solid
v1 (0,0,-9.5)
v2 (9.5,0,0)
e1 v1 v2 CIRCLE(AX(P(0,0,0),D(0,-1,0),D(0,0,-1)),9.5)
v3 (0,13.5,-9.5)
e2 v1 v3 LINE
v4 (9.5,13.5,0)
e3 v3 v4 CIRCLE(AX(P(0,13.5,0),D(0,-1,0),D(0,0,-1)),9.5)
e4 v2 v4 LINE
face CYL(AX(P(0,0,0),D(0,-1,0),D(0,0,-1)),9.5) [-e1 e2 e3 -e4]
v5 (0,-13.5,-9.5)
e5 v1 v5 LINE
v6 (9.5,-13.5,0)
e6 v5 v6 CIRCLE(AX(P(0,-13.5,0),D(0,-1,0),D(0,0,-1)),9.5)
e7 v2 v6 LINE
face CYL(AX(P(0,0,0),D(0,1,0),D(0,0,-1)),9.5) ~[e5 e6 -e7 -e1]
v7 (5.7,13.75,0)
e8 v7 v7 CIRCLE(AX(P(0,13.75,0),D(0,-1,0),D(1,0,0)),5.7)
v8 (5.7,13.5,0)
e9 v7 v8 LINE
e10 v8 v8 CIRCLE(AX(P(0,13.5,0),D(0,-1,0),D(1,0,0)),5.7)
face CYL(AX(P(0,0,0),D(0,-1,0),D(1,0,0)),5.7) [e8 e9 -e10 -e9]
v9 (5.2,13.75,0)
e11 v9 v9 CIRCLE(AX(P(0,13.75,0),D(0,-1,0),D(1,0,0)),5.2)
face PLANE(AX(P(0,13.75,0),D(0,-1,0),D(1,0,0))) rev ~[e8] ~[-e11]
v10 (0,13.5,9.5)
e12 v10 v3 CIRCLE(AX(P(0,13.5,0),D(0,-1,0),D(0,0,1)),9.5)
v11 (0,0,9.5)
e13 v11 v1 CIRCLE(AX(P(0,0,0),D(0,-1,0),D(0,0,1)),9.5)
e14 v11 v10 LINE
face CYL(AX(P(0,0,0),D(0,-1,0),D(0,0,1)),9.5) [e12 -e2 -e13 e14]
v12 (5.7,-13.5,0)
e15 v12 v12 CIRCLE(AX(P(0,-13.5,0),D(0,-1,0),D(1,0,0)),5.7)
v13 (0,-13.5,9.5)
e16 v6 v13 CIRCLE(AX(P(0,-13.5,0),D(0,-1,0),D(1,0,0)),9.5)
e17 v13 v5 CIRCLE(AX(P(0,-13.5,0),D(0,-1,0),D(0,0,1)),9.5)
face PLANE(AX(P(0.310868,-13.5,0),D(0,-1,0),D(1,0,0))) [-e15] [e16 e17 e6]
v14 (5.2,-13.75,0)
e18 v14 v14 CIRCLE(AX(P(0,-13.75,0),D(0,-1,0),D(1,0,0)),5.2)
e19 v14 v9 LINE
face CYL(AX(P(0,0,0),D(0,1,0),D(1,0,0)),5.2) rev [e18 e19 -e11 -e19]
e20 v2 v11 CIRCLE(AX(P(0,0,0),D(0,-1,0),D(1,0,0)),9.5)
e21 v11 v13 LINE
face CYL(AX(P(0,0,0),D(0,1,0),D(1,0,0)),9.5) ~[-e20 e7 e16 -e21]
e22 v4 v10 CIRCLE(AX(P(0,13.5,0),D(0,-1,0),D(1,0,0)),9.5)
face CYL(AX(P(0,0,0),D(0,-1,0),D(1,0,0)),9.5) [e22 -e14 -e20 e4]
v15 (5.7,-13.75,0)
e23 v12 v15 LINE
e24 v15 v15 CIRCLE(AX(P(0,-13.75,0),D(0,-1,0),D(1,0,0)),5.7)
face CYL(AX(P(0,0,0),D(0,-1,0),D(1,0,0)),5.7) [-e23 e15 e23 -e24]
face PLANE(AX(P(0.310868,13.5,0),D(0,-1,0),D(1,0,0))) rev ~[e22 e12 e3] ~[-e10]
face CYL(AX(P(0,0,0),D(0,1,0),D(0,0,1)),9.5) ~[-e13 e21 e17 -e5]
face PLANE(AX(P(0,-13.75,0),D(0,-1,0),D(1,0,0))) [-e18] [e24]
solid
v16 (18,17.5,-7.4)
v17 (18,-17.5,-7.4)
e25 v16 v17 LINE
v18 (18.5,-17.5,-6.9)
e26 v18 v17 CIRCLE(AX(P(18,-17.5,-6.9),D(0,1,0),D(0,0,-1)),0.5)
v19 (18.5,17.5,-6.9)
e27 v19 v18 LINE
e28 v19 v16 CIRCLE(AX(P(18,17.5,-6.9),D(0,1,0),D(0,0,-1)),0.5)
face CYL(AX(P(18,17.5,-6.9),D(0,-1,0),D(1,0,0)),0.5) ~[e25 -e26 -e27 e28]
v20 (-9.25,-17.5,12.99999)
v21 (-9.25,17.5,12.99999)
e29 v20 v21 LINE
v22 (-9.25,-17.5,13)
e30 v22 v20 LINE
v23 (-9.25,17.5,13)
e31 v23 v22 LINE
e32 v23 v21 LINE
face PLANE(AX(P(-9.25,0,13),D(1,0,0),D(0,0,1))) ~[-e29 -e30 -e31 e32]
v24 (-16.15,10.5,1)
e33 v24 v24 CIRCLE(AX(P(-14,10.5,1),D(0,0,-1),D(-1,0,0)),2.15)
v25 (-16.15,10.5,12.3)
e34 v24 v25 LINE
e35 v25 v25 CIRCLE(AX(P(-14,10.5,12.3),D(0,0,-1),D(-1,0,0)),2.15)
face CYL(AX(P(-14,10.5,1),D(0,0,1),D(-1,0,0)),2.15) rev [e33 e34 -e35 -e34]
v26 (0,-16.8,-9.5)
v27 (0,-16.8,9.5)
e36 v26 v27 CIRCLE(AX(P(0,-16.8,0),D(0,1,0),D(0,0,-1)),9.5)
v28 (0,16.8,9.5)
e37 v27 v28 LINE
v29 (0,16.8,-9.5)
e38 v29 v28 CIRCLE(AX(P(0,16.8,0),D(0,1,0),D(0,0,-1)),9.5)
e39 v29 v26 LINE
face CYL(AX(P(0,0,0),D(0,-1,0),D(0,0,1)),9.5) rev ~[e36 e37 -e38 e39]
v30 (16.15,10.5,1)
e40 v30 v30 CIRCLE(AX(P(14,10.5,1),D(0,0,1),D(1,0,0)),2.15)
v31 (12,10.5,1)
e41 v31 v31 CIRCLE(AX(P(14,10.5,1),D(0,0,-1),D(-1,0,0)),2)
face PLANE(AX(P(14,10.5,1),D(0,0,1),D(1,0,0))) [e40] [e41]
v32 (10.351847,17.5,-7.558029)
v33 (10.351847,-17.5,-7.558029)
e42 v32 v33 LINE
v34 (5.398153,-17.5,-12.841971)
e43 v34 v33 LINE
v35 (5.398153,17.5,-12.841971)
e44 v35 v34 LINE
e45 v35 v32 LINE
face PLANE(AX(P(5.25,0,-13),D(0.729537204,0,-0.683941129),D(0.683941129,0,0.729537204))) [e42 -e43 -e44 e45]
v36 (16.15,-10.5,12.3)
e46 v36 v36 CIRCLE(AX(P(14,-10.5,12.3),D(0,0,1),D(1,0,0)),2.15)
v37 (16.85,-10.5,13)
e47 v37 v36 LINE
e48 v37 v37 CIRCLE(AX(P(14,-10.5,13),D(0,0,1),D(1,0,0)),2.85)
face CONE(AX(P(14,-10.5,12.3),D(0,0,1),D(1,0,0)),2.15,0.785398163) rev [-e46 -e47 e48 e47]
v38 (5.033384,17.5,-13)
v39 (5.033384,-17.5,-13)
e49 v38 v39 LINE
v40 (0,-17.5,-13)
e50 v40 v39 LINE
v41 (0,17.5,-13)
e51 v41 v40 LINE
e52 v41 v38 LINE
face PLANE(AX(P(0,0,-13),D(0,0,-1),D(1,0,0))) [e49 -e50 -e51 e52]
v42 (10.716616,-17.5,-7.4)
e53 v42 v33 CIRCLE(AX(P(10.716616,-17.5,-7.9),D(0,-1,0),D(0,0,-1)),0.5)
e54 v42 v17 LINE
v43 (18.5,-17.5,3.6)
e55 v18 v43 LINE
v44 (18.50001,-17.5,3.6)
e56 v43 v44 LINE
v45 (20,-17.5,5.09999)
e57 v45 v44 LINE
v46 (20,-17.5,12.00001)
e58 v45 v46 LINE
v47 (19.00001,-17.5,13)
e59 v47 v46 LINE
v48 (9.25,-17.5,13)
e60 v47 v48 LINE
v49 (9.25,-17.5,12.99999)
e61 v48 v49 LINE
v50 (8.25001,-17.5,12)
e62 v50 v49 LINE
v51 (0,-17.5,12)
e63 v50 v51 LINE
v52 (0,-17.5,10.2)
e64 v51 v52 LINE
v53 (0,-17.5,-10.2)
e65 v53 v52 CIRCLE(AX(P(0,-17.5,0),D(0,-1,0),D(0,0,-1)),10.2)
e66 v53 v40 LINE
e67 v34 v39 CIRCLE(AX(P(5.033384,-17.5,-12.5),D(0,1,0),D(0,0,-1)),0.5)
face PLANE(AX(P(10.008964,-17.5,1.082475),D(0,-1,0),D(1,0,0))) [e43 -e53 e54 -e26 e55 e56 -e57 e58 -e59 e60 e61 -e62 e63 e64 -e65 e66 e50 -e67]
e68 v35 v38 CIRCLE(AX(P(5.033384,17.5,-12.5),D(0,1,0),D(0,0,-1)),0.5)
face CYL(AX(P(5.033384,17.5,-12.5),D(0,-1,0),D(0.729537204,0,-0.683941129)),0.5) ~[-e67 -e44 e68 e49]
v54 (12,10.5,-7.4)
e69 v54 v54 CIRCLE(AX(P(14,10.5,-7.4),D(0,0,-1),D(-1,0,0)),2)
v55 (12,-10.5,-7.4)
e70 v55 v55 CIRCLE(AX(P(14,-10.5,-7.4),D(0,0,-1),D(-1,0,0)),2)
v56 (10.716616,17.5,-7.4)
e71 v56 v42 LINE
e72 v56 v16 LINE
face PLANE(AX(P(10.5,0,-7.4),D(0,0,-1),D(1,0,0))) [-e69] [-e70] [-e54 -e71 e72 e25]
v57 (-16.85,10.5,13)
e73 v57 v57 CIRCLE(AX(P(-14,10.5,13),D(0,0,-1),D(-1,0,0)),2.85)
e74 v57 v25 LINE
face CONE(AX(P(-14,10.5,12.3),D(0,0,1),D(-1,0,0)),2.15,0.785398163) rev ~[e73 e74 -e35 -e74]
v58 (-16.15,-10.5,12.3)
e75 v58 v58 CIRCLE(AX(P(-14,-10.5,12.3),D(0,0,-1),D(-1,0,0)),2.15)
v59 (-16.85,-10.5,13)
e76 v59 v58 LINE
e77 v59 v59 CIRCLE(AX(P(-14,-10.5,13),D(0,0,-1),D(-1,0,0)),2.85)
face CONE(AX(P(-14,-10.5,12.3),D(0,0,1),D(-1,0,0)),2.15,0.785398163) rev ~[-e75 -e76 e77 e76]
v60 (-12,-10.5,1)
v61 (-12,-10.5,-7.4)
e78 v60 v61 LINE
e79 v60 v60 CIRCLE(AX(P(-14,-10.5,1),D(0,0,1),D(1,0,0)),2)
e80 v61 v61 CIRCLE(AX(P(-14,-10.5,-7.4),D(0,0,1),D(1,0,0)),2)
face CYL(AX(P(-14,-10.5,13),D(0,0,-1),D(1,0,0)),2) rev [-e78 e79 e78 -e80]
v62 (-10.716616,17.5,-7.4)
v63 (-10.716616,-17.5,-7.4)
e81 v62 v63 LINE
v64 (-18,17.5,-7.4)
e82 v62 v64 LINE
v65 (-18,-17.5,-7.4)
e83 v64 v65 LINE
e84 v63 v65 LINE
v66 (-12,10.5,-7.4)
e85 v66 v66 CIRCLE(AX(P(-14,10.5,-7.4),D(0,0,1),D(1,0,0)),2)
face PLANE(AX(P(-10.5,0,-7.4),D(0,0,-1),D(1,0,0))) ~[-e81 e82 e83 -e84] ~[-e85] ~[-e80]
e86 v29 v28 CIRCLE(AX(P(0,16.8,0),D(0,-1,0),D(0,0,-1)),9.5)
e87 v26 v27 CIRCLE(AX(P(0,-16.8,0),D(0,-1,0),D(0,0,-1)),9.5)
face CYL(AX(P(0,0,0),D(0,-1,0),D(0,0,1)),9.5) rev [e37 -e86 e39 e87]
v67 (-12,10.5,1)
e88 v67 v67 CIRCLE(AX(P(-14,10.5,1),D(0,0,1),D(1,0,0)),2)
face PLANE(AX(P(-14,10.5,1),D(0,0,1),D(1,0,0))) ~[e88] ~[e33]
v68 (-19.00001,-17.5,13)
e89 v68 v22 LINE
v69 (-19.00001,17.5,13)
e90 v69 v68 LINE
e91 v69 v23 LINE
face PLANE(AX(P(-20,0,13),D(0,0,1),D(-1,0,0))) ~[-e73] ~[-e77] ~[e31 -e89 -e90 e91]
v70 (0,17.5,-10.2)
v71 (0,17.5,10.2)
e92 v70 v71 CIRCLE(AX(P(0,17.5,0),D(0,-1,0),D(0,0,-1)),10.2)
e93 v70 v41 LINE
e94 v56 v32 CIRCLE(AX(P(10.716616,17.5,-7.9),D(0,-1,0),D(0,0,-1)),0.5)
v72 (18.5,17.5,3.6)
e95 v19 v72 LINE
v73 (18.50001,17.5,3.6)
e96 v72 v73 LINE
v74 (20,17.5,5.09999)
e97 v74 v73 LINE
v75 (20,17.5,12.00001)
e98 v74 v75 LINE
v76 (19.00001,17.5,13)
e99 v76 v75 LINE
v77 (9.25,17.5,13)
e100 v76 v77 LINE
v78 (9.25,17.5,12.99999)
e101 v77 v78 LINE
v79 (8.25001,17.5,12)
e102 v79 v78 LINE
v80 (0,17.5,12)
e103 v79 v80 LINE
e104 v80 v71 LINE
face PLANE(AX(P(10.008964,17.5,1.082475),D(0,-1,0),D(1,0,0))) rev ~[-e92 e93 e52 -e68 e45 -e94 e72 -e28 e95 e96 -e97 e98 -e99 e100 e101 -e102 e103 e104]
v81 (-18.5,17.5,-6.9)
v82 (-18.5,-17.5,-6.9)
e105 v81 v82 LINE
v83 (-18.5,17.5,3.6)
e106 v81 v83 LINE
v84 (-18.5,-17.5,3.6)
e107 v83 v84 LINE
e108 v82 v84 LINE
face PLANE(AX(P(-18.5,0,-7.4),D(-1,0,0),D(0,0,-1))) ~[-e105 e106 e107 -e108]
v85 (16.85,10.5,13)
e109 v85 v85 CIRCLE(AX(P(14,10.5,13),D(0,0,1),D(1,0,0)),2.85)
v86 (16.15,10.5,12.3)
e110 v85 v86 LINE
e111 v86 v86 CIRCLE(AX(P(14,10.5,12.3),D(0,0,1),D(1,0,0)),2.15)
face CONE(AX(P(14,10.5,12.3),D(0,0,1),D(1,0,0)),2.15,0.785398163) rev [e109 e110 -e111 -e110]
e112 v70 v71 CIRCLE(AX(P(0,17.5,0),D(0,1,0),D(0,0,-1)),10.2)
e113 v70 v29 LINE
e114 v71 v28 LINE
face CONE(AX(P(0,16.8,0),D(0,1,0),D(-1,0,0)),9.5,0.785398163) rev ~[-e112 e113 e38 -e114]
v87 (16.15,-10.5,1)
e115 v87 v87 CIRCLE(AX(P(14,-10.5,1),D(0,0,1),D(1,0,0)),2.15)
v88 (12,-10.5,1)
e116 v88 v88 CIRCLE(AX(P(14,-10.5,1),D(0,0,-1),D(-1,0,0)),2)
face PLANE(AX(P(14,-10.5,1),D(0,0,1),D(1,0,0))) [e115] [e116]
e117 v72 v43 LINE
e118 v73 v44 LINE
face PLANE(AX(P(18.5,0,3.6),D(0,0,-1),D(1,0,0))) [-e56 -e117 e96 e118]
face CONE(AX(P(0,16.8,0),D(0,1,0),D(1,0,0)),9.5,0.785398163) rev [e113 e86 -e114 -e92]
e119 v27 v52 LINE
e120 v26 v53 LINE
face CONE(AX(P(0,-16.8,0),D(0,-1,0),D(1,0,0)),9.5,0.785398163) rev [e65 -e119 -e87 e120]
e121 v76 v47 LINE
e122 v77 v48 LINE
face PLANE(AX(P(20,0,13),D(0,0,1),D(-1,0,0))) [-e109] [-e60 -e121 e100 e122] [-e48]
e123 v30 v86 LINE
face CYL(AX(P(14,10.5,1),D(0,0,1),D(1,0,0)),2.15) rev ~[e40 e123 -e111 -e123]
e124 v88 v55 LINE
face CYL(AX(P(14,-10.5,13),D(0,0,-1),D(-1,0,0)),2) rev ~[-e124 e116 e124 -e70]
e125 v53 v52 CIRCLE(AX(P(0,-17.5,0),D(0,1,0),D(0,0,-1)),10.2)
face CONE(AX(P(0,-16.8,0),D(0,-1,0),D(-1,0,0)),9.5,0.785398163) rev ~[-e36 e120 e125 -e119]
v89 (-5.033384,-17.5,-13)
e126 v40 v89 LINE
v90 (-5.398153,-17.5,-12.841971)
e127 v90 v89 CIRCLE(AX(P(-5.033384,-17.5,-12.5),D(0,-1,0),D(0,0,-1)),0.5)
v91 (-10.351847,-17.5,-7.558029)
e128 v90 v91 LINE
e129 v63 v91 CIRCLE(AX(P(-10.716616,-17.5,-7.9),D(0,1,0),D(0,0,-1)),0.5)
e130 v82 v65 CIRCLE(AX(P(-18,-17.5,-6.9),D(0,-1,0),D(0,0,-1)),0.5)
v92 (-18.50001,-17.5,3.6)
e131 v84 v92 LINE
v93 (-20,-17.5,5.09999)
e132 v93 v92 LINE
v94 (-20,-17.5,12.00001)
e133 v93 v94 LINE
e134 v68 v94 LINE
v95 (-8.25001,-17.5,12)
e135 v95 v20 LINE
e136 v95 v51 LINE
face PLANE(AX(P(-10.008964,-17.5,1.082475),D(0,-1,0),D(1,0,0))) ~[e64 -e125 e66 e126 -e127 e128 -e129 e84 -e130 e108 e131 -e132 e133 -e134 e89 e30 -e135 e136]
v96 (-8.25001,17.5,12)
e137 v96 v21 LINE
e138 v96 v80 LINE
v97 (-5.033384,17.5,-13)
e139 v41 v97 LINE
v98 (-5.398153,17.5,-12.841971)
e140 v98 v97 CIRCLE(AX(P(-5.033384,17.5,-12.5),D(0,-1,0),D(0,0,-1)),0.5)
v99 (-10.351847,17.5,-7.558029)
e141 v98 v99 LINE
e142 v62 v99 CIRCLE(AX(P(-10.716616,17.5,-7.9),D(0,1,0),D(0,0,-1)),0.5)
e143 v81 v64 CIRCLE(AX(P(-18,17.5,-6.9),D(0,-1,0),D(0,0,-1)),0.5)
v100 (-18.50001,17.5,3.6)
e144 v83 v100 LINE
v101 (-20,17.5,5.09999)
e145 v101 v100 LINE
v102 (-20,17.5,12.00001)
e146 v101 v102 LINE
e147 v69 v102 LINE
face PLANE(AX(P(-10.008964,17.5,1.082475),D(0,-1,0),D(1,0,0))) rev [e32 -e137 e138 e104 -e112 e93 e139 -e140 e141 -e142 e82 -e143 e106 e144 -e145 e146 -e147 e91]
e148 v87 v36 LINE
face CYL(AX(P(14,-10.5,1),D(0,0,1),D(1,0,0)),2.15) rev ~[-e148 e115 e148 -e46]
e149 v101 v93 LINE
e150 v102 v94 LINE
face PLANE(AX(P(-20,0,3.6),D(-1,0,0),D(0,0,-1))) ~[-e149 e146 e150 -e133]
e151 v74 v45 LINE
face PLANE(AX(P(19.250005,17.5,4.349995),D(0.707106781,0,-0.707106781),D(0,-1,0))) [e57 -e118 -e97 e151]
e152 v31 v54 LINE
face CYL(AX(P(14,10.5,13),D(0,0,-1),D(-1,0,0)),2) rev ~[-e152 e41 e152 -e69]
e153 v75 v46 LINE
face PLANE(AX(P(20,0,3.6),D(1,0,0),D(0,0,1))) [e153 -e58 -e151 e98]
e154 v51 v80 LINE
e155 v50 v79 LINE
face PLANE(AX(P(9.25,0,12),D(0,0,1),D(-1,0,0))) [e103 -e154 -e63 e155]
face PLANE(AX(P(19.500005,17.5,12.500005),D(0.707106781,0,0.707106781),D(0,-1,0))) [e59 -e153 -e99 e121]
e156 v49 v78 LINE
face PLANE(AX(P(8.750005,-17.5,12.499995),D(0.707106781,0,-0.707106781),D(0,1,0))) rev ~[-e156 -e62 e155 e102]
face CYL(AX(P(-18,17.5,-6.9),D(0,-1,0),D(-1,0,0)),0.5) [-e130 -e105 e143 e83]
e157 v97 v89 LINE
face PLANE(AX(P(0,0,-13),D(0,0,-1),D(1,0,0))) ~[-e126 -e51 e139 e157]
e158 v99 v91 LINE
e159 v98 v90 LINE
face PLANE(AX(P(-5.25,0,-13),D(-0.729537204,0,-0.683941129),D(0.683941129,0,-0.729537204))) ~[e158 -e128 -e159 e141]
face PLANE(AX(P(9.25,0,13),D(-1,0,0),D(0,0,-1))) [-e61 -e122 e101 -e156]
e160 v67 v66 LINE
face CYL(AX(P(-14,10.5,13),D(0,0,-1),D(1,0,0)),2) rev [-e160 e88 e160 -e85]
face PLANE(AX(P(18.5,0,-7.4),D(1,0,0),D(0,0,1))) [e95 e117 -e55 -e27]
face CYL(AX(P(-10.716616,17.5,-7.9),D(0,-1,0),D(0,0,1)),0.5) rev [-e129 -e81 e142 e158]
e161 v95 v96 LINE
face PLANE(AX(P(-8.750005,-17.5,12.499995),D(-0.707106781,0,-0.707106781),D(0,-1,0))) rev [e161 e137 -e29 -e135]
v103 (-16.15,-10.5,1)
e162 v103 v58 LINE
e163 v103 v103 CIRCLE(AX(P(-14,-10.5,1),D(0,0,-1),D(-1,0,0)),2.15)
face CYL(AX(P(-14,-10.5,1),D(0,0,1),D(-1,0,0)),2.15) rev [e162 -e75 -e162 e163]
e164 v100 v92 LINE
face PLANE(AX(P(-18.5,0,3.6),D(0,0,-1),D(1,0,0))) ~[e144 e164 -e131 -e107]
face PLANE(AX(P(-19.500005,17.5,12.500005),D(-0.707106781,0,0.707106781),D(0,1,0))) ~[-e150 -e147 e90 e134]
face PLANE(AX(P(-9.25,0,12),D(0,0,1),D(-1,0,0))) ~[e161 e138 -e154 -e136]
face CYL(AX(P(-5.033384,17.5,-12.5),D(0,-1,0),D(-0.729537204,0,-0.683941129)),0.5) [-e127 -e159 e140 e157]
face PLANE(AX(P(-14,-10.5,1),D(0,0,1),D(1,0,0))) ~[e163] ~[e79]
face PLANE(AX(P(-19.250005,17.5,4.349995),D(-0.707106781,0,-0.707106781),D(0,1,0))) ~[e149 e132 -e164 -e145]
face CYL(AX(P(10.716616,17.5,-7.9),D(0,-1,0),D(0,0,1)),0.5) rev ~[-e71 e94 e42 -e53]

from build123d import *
from build123d import SkipClean  # not in build123d's __all__

# Parameters (mm, degrees)
F1_DEPTH       = 17.5
F2_SIZE        = 0.99999
F3_SIZE        = 1.49999
F4_R           = 0.5
F6_D           = 4
F6_CBORE_D     = 4.3
F6_CBORE_DEPTH = 12
F7_SIZE        = 0.7
F0_R           = 5.7
F8_DEPTH       = 13.5
F0_R_2         = 5.2
F9_DEPTH       = 13.75


# Not quite as in the source:
# - a fillet or chamfer is up to 0.001 mm smaller than in the source, because OpenCascade refuses the exact size


with BuildPart() as f1:
    # F0 (on Front) → F1 (new body, symmetric)
    with BuildSketch(Plane.XZ):
        with BuildLine():
            ThreePointArc((0, 9.5), (6.7175144213, 6.7175144213), (9.5, 0))
            ThreePointArc((9.5, 0), (6.7175144213, -6.7175144213), (0, -9.5))
            Line((0, -9.5), (0, -13))
            Line((0, -13), (5.25, -13))
            Line((5.25, -13), (10.5, -7.4))
            Line((10.5, -7.4), (18.5, -7.4))
            Line((18.5, -7.4), (18.5, 3.6))
            Line((18.5, 3.6), (20, 3.6))
            Line((20, 3.6), (20, 13))
            Line((20, 13), (9.25, 13))
            Line((9.25, 13), (9.25, 12))
            Line((9.25, 12), (0, 12))
            Line((0, 12), (0, 9.5))
        make_face()
    extrude(amount=F1_DEPTH, both=True)

    # F2 (size 1 in the source; OpenCascade refuses exactly that, so slightly less here)
    f2_edges = [f1.edges().sort_by_distance(p)[0] for p in [
        (9.25, 0, 12),
        (20, 0, 13),
    ]]
    chamfer(f2_edges, length=F2_SIZE)

    # F3 (size 1.5 in the source; OpenCascade refuses exactly that, so slightly less here)
    f3_edges = [f1.edges().sort_by_distance(p)[0] for p in [
        (20, 0, 3.6),
    ]]
    chamfer(f3_edges, length=F3_SIZE)

    # F4
    f4_edges = [f1.edges().sort_by_distance(p)[0] for p in [
        (18.5, 0, -7.4),
        (10.5, 0, -7.4),
        (5.25, 0, -13),
    ]]
    fillet(f4_edges, radius=F4_R)

    # F6 (through all)
    with Locations(Plane.XY.offset(13)):
        with Locations((14, 10.5), (14, -10.5)):
            CounterBoreHole(F6_D / 2, F6_CBORE_D / 2, F6_CBORE_DEPTH)

    # F7
    f7_edges = [f1.edges().sort_by_distance(p)[0] for p in [
        (9.5, -17.5, 0),
        (9.5, 17.5, 0),
        (11.85, 10.5, 13),
        (11.85, -10.5, 13),
    ]]
    chamfer(f7_edges, length=F7_SIZE)

    # F10: F1 across plane


with BuildPart() as f8:
    # F0 (on Front) → F8 (new body, symmetric)
    with BuildSketch(Plane.XZ):
        with BuildLine():
            ThreePointArc((0, -9.5), (6.7175144213, -6.7175144213), (9.5, 0))
            ThreePointArc((9.5, 0), (6.7175144213, 6.7175144213), (0, 9.5))
            ThreePointArc((0, 9.5), (-9.5, 0), (0, -9.5))
        make_face()
        Circle(F0_R, mode=Mode.SUBTRACT)
    extrude(amount=F8_DEPTH, both=True)

    # F0 (on Front) → F9 (join, symmetric)
    with BuildSketch(Plane.XZ):
        Circle(F0_R)
        Circle(F0_R_2, mode=Mode.SUBTRACT)
    extrude(amount=F9_DEPTH, both=True)


with BuildPart() as f1_1:
    add(f1.part, clean=False)
    with SkipClean():  # cleaning this boolean's faces spoils the solid; the shape is the same uncleaned
        add(f1.part.mirror(Plane.YZ), clean=False)


solid = Compound([f8.part, f1_1.part])
